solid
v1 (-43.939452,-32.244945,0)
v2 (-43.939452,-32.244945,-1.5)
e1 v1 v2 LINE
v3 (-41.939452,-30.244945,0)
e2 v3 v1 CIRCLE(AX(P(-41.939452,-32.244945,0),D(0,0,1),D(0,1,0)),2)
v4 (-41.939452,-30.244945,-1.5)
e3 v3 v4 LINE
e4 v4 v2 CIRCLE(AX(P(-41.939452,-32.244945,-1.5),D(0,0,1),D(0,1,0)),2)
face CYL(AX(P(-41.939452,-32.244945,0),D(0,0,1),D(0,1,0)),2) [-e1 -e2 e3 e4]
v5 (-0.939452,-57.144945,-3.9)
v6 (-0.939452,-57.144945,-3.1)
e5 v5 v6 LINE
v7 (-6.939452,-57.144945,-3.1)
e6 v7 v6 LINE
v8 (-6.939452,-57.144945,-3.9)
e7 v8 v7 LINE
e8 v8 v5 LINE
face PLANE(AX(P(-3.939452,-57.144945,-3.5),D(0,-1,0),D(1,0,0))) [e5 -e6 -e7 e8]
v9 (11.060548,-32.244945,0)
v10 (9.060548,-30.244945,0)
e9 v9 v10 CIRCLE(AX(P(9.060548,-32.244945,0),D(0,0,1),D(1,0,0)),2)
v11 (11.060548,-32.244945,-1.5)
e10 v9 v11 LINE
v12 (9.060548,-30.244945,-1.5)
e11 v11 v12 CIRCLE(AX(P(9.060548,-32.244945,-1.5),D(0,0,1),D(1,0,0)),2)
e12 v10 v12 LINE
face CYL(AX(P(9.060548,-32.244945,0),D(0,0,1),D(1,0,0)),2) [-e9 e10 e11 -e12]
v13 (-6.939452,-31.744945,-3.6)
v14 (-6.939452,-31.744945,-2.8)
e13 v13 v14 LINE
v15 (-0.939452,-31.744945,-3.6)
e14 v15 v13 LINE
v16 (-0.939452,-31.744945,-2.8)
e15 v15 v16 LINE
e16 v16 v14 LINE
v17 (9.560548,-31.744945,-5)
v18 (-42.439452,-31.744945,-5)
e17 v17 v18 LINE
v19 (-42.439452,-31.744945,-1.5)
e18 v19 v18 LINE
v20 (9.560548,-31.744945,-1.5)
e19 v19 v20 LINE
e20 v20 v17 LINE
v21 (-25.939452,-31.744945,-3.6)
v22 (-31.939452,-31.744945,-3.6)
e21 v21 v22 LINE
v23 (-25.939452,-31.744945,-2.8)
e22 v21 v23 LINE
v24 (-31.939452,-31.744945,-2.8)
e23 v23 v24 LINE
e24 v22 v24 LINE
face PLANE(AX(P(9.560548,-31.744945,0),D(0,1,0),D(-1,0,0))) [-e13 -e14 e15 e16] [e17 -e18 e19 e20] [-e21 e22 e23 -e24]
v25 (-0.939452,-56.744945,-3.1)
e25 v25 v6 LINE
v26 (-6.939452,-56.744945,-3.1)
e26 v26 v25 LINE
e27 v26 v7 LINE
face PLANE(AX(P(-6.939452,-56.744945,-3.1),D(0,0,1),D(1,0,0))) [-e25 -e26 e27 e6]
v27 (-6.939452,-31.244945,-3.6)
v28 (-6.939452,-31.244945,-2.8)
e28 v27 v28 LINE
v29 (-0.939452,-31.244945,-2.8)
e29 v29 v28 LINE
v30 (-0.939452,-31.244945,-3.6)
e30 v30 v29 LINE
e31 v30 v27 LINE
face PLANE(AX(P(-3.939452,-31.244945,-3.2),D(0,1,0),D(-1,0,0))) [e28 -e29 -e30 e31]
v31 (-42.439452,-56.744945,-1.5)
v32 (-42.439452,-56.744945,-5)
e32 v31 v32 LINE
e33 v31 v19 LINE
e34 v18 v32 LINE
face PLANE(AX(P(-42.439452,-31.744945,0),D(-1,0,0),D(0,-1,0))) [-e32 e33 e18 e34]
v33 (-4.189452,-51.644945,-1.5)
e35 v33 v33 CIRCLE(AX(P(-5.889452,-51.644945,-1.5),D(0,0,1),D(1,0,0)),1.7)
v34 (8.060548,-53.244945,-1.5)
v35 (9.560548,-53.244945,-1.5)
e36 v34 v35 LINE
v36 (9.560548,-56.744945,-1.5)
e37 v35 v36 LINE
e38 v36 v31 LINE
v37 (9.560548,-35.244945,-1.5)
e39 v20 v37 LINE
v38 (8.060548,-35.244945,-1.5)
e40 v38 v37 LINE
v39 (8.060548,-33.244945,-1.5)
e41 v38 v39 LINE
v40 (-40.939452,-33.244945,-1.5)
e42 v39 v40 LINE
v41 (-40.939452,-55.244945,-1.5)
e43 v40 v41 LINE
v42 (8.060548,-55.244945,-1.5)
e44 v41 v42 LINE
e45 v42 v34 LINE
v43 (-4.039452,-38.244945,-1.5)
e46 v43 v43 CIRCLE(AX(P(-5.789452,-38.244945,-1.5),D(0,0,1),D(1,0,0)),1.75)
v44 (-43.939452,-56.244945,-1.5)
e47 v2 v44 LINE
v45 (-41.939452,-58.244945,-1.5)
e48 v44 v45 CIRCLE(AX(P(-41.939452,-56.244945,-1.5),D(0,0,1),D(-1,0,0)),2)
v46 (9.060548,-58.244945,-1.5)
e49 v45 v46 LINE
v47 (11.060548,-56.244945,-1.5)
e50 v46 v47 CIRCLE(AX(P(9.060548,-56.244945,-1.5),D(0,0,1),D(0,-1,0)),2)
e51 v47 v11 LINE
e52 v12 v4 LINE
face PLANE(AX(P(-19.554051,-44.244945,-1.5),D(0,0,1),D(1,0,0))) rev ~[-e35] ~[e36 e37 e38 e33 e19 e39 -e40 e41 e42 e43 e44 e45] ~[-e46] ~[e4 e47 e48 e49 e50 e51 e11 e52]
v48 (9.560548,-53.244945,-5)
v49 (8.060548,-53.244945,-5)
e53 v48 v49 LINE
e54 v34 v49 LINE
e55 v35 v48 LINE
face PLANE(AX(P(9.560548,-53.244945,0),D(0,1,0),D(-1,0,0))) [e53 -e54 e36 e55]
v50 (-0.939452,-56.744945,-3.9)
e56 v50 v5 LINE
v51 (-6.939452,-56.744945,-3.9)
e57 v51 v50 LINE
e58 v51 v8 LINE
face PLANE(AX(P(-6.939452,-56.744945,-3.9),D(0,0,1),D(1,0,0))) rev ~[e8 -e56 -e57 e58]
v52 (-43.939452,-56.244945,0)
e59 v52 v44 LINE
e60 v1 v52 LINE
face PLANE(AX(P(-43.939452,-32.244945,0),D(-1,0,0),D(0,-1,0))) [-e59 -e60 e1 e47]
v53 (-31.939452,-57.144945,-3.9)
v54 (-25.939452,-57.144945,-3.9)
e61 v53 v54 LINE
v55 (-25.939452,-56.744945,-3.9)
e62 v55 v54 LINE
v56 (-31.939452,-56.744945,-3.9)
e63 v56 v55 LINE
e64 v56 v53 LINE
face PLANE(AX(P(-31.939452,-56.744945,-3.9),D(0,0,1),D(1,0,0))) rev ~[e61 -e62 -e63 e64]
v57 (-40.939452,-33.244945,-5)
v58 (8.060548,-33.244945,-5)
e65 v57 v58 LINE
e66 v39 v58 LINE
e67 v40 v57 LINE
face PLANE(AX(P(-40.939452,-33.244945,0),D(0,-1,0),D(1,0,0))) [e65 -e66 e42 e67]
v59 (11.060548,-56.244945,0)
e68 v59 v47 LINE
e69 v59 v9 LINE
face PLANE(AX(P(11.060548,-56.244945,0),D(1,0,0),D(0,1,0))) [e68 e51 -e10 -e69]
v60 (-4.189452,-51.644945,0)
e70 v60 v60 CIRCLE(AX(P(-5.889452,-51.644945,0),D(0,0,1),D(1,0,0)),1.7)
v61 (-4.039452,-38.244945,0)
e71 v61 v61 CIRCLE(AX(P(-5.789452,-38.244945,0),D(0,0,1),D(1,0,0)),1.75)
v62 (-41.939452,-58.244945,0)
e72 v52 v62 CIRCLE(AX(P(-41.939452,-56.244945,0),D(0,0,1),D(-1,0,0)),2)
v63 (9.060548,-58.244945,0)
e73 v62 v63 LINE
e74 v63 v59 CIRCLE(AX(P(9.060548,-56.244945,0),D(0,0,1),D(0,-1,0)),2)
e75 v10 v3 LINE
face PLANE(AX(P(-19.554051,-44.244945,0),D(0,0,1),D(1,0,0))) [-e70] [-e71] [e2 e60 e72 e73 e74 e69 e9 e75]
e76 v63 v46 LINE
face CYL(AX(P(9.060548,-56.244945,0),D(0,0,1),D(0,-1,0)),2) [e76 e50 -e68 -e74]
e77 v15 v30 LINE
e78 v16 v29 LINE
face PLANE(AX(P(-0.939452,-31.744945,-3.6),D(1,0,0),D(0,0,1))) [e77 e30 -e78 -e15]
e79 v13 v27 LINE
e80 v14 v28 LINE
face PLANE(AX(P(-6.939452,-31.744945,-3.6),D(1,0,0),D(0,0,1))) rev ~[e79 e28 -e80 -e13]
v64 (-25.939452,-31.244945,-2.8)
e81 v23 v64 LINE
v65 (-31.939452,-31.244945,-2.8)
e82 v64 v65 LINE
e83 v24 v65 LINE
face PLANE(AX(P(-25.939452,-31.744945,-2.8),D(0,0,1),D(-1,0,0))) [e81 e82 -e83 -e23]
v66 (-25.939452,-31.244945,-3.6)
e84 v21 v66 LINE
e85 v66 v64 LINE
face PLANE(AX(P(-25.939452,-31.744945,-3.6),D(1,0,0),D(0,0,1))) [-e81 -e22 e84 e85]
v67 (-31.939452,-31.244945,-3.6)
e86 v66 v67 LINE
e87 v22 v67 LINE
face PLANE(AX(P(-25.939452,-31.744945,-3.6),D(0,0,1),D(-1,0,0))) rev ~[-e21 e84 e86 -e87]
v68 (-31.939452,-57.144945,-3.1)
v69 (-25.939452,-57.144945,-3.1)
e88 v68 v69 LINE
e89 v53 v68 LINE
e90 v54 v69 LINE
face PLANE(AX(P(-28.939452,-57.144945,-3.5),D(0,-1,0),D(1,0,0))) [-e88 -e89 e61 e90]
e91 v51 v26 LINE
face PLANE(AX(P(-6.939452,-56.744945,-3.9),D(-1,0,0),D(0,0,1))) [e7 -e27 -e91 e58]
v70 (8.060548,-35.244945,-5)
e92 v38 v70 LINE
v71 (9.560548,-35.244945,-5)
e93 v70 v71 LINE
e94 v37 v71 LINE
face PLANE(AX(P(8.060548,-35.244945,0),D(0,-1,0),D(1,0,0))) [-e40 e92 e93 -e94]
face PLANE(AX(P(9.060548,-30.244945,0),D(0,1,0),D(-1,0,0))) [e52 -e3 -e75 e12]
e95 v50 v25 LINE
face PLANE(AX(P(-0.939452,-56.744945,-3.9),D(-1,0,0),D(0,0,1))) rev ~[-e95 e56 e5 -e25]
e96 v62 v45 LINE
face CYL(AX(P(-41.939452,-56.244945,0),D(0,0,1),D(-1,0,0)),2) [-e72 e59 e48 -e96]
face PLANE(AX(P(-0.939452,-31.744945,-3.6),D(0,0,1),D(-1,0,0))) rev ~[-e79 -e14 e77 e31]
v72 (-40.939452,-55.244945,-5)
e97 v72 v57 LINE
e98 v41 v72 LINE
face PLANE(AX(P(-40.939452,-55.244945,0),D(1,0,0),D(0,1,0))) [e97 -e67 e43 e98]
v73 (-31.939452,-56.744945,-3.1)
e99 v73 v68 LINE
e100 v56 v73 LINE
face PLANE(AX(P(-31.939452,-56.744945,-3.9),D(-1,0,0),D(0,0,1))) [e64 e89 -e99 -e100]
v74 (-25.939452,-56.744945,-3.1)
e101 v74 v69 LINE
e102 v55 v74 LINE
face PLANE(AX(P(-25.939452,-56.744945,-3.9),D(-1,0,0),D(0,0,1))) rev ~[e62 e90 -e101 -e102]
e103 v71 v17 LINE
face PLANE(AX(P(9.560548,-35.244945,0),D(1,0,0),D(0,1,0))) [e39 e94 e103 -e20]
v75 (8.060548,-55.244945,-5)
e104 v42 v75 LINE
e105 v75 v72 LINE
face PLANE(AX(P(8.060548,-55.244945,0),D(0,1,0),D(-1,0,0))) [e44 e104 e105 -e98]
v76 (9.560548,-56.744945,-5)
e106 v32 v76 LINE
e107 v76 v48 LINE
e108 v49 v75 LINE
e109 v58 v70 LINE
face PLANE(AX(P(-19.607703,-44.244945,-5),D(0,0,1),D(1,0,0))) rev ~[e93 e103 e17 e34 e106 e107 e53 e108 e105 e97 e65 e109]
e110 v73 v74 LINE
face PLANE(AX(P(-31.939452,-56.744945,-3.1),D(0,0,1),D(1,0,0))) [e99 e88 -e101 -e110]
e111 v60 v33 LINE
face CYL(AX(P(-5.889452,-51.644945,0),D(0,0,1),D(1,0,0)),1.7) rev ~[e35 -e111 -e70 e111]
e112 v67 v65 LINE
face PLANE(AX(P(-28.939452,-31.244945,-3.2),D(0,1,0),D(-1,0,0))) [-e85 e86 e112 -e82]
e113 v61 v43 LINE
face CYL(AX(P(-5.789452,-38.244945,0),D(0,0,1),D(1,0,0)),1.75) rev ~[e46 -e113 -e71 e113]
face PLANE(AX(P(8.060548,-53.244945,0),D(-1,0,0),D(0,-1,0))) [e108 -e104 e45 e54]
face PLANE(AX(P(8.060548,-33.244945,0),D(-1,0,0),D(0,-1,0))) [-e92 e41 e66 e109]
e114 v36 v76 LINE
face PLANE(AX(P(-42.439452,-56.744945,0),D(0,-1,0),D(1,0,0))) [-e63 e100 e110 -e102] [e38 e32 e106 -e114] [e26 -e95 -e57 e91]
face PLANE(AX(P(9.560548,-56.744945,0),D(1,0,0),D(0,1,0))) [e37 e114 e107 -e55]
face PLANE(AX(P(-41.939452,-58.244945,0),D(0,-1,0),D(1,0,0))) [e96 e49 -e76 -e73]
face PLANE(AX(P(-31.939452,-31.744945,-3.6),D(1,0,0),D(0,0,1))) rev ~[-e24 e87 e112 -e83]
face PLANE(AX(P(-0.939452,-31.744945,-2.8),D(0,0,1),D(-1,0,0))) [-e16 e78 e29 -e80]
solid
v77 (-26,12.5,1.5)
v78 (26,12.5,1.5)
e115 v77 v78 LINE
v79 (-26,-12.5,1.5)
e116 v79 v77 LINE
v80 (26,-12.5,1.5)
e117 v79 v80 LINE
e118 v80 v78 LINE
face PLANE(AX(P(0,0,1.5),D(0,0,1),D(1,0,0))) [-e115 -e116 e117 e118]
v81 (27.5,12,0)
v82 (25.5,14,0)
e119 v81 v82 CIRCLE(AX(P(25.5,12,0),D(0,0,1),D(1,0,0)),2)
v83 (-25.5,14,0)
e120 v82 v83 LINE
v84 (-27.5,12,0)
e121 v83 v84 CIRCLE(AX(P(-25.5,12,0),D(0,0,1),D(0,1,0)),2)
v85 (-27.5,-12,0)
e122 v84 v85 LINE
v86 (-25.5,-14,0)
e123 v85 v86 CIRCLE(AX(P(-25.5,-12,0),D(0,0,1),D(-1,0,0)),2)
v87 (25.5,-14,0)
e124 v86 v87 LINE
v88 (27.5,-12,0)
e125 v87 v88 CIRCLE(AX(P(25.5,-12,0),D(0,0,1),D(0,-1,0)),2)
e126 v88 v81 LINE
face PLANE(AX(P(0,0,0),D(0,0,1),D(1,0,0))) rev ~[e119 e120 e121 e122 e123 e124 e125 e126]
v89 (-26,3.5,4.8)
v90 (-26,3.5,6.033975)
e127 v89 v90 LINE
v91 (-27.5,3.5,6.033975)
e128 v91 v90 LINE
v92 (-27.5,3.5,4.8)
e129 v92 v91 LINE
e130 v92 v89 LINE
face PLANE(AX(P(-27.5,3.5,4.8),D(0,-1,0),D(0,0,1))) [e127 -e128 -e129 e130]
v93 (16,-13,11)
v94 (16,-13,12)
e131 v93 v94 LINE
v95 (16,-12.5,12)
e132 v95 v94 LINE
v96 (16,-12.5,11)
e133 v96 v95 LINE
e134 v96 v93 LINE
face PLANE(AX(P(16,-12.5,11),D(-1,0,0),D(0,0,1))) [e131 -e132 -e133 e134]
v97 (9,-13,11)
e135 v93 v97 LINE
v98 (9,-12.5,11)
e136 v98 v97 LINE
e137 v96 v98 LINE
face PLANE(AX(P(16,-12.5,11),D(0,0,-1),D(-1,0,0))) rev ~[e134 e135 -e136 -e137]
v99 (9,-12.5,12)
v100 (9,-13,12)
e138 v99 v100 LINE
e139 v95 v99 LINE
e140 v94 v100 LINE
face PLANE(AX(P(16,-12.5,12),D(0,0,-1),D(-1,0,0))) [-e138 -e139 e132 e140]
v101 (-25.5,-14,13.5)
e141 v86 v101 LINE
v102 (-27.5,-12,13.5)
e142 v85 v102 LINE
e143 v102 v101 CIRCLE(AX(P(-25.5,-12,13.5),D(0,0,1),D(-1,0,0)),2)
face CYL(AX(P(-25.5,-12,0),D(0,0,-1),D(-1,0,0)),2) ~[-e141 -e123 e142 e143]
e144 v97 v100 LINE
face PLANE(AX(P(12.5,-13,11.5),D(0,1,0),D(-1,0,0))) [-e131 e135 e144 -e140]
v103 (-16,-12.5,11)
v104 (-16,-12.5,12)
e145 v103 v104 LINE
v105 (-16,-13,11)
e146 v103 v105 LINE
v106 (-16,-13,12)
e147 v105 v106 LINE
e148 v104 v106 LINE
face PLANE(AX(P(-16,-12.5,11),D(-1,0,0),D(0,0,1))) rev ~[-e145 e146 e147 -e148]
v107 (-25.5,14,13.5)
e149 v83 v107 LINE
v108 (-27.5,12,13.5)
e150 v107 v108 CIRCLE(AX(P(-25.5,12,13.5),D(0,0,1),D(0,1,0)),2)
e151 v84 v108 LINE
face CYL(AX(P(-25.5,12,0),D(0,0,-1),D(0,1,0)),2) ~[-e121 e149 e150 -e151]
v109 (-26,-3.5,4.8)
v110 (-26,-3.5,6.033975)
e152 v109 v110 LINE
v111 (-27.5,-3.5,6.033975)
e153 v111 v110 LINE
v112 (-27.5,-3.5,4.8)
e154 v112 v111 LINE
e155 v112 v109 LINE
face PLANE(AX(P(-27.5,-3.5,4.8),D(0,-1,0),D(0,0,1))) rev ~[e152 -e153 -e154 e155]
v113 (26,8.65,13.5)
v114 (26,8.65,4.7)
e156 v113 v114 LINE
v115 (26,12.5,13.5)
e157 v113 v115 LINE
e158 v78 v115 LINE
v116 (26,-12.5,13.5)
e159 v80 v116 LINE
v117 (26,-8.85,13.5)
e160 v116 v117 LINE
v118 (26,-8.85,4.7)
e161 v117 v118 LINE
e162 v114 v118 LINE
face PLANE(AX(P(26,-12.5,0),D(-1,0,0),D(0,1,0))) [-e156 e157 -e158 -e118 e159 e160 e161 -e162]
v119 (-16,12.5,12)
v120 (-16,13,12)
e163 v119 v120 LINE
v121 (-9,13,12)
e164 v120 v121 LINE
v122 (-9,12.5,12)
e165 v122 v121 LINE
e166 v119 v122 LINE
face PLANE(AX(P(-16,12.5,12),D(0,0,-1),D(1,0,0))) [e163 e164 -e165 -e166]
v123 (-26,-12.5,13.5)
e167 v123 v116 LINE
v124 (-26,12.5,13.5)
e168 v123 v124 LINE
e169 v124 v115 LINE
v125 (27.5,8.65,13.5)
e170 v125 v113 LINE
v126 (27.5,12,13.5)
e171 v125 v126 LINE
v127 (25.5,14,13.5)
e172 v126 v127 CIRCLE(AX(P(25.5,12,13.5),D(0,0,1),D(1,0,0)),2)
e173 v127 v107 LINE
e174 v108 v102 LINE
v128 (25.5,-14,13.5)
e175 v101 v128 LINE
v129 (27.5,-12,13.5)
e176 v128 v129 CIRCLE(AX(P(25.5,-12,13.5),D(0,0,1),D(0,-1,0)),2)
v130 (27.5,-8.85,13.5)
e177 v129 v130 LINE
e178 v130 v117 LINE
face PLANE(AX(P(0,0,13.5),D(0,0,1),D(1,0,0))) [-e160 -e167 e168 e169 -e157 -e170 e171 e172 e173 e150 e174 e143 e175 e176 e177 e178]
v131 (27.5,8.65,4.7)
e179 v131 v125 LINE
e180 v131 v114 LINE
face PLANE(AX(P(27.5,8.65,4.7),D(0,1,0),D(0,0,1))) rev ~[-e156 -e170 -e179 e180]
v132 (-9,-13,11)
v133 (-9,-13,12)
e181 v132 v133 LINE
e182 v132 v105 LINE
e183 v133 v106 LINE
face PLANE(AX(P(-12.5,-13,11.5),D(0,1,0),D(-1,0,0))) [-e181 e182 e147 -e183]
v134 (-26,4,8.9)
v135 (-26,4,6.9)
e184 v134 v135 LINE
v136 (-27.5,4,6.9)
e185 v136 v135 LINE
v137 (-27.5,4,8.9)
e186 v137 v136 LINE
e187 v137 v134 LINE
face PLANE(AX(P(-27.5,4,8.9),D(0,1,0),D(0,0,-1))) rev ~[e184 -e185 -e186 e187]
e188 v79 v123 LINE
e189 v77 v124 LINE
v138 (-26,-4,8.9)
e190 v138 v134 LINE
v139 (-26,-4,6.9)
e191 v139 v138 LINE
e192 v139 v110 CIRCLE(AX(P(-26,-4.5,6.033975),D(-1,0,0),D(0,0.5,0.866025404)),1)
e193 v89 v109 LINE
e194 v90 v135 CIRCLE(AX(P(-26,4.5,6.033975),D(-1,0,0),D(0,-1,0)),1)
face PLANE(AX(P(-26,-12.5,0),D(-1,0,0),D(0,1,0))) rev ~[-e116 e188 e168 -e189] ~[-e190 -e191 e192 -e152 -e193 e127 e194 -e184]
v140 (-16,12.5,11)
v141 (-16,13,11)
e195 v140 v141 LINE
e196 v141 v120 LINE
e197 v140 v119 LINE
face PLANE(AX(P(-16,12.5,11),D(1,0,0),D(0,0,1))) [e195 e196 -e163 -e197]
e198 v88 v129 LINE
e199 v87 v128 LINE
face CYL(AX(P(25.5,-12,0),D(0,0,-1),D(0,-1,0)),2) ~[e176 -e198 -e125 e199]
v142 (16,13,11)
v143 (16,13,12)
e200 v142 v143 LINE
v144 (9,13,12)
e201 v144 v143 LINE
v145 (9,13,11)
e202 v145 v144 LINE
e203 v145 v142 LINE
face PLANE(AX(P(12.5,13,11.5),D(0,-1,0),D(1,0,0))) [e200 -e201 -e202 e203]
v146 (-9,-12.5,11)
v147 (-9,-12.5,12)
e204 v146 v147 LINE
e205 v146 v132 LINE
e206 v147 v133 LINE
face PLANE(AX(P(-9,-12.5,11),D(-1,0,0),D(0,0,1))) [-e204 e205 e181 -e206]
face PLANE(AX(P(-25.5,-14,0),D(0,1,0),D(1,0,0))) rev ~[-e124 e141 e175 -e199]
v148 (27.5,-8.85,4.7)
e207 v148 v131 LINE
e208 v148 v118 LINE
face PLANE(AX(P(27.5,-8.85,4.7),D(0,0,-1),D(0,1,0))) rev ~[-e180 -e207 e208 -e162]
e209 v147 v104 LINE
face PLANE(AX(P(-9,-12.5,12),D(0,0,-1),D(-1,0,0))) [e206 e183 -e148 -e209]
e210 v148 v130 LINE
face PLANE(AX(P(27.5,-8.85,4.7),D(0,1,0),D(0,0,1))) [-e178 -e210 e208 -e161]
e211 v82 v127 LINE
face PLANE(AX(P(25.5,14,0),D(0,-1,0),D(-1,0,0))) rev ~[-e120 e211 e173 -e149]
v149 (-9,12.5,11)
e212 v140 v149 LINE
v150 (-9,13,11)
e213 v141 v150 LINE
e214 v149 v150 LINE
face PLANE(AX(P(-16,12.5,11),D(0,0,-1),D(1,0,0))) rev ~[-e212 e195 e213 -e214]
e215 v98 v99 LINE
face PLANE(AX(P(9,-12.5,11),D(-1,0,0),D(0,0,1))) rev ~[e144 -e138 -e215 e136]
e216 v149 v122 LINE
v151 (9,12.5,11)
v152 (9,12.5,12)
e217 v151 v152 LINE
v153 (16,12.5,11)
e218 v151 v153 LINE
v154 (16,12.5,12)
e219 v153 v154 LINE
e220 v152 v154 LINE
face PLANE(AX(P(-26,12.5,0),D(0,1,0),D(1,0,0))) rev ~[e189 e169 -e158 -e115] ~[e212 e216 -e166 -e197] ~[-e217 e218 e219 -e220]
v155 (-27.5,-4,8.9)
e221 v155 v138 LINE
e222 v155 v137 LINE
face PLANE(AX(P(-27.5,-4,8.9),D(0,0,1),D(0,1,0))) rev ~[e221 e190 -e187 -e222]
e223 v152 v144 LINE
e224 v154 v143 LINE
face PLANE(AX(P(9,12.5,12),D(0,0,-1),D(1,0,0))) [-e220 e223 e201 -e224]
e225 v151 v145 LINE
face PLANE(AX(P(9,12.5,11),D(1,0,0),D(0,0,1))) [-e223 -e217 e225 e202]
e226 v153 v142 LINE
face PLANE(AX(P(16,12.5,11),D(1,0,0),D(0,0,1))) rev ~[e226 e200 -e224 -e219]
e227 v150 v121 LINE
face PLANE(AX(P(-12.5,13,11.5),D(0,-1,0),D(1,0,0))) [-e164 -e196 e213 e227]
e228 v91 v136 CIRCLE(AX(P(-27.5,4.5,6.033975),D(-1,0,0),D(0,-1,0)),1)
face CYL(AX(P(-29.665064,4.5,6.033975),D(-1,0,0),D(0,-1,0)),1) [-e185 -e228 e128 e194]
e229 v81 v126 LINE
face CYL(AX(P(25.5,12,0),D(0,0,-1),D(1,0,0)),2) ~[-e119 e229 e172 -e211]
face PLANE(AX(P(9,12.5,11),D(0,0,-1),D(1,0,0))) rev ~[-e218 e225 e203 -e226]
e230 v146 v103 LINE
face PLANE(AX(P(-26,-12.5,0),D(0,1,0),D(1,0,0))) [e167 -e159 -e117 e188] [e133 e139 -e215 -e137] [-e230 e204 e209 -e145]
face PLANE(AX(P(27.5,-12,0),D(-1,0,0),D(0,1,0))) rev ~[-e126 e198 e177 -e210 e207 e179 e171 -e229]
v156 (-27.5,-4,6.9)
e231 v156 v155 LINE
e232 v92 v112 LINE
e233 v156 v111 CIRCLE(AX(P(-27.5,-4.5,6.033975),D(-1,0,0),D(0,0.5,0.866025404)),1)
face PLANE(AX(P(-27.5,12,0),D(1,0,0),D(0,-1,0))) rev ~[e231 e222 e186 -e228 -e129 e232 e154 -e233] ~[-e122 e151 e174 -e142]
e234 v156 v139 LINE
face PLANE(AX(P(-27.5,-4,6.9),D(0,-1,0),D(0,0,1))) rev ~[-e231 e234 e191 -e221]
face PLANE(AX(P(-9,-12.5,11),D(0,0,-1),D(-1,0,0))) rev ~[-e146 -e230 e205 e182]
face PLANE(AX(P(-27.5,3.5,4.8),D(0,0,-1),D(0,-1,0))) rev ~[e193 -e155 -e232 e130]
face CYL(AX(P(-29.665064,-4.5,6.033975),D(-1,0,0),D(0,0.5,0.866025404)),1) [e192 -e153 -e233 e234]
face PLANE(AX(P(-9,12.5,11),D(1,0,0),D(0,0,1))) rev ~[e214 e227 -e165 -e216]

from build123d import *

# Parameters (mm, degrees)
F0_W        = 52
F0_H        = 25
F0_R        = 1.75
F1_DEPTH    = 1.5
F2_DEPTH    = 13.5
F3_W        = 17.5
F3_H        = 8.8
F4_DEPTH    = 25
F5_W        = 7
F5_H        = 2.1
F6_DEPTH    = 2
F7_T1_DEPTH = 5.8301270189
F9_W        = 7
F9_H        = 1
F10_DEPTH   = 0.5
F11_W       = 7
F11_H       = 1
F12_DEPTH   = 0.5
F0_R_2      = 1.7
F0_W_2      = 1.5
F0_H_2      = 18
F13_DEPTH   = 1.5
F14_DEPTH   = 5
F15_W       = 6
F15_H       = 0.8
F16_DEPTH   = 0.4
F17_W       = 6
F17_H       = 0.8
F18_DEPTH   = 0.5


# Not quite as in the source:
# - a fillet or chamfer that OpenCascade refuses, or shapes differently, is made with other operations: its cross-section is extruded or revolved along the edge and cut away or added


with BuildPart() as f1:
    # F0 (on Top) → F1 (new body)
    with BuildSketch(Plane.XY):
        Rectangle(F0_W, F0_H)
        with Locations((-21.9428632408, 0)):
            Circle(F0_R, mode=Mode.SUBTRACT)
        with Locations((-21.9428632408, 0)):
            Circle(F0_R)
    extrude(amount=F1_DEPTH)

    # F0 (on Top) → F2 (join)
    with BuildSketch(Plane.XY):
        with BuildLine():
            Line((25.5, 14), (-25.5, 14))
            ThreePointArc((-25.5, 14), (-26.9142135624, 13.4142135624), (-27.5, 12))
            Line((-27.5, 12), (-27.5, -12))
            ThreePointArc((-27.5, -12), (-26.9142135624, -13.4142135624), (-25.5, -14))
            Line((-25.5, -14), (25.5, -14))
            ThreePointArc((25.5, -14), (26.9142135624, -13.4142135624), (27.5, -12))
            Line((27.5, -12), (27.5, 12))
            ThreePointArc((27.5, 12), (26.9142135624, 13.4142135624), (25.5, 14))
        make_face()
        Rectangle(F0_W, F0_H, mode=Mode.SUBTRACT)
    extrude(amount=F2_DEPTH)

    # F3 (on face) → F4 (cut)
    with BuildSketch(Plane.YZ.offset(27.5)):
        with Locations((-0.1, 9.1)):
            Rectangle(F3_W, F3_H)
    extrude(amount=-F4_DEPTH, mode=Mode.SUBTRACT)

    # F5 (on face) → F6 (cut)
    with BuildSketch(Plane(origin=(-27.5, 0, 0), x_dir=(0, -1, 0), z_dir=(-1, 0, 0))):
        with Locations((0, 5.85)):
            Rectangle(F5_W, F5_H)
        Polygon((-3.5, 6.9), (3.5, 6.9), (4, 6.9), (4, 8.9), (-4, 8.9), (-4, 6.9), align=None)
    extrude(amount=-F6_DEPTH, mode=Mode.SUBTRACT)

    # F7: fillet of radius 1 on 2 edges, made by hand

    # F7_s2 → F7_t1 (cut)
    with BuildSketch(Plane.YZ.offset(-29.6650635095)):
        with BuildLine():
            ThreePointArc((3.5, 6.0339745962), (3.6339745962, 6.5339745962), (4, 6.9))
            Line((4, 6.9), (3.5, 6.9))
            Line((3.5, 6.9), (3.5, 6.0339745962))
        make_face()
        with BuildLine():
            ThreePointArc((-4, 6.9), (-3.6339745962, 6.5339745962), (-3.5, 6.0339745962))
            Line((-3.5, 6.0339745962), (-3.5, 6.9))
            Line((-3.5, 6.9), (-4, 6.9))
        make_face()
    extrude(amount=F7_T1_DEPTH, mode=Mode.SUBTRACT)

    # F9 (on face) → F10 (cut)
    with BuildSketch(Plane.XZ.offset(-12.5)):
        with Locations((-12.5, 11.5)):
            Rectangle(F9_W, F9_H)
        with Locations((12.5, 11.5)):
            Rectangle(F9_W, F9_H)
    extrude(amount=-F10_DEPTH, mode=Mode.SUBTRACT)

    # F11 (on face) → F12 (cut)
    with BuildSketch(Plane(origin=(0, -12.5, 0), x_dir=(-1, 0, 0), z_dir=(0, 1, 0))):
        with Locations((-12.5, 11.5)):
            Rectangle(F11_W, F11_H)
        with Locations((12.5, 11.5)):
            Rectangle(F11_W, F11_H)
    extrude(amount=-F12_DEPTH, mode=Mode.SUBTRACT)


with BuildPart() as f13:
    # F0 (on Top) → F13 (new body)
    with BuildSketch(Plane.XY):
        with BuildLine():
            Line((-42.439452043, -56.7449450493), (-42.439452043, -31.7449450493))
            Line((-42.439452043, -31.7449450493), (9.560547957, -31.7449450493))
            Line((9.560547957, -31.7449450493), (9.560547957, -35.2449450493))
            Line((9.560547957, -35.2449450493), (11.060547957, -35.2449450493))
            Line((11.060547957, -35.2449450493), (11.060547957, -32.2449450493))
            ThreePointArc((11.060547957, -32.2449450493), (10.4747615194, -30.8307314869), (9.060547957, -30.2449450493))
            Line((9.060547957, -30.2449450493), (-41.939452043, -30.2449450493))
            ThreePointArc((-41.939452043, -30.2449450493), (-43.3536656054, -30.8307314869), (-43.939452043, -32.2449450493))
            Line((-43.939452043, -32.2449450493), (-43.939452043, -56.2449450493))
            ThreePointArc((-43.939452043, -56.2449450493), (-43.3536656054, -57.6591586117), (-41.939452043, -58.2449450493))
            Line((-41.939452043, -58.2449450493), (9.060547957, -58.2449450493))
            ThreePointArc((9.060547957, -58.2449450493), (10.4747615194, -57.6591586117), (11.060547957, -56.2449450493))
            Line((11.060547957, -56.2449450493), (11.060547957, -53.2449450493))
            Line((11.060547957, -53.2449450493), (9.560547957, -53.2449450493))
            Line((9.560547957, -53.2449450493), (9.560547957, -56.7449450493))
            Line((9.560547957, -56.7449450493), (-42.439452043, -56.7449450493))
        make_face()
        Polygon((8.060547957, -53.2449450493), (8.060547957, -35.2449450493), (8.060547957, -33.2449450493), (-40.939452043, -33.2449450493), (-40.939452043, -55.2449450493), (8.060547957, -55.2449450493), align=None)
        with Locations((-38.3823152838, -44.2449450493)):
            Circle(F0_R, mode=Mode.SUBTRACT)
        with Locations((-5.889452043, -51.6449450493)):
            Circle(F0_R_2, mode=Mode.SUBTRACT)
        with Locations((-5.789452043, -38.2449450493)):
            Circle(F0_R, mode=Mode.SUBTRACT)
        with Locations((-38.3823152838, -44.2449450493)):
            Circle(F0_R)
        with Locations((8.810547957, -44.2449450493)):
            Rectangle(F0_W_2, F0_H_2)
        with Locations((10.310547957, -44.2449450493)):
            Rectangle(F0_W_2, F0_H_2)
    extrude(amount=-F13_DEPTH)

    # F0 (on Top) → F14 (join)
    with BuildSketch(Plane.XY):
        Polygon((9.560547957, -31.7449450493), (-42.439452043, -31.7449450493), (-42.439452043, -56.7449450493), (9.560547957, -56.7449450493), (9.560547957, -53.2449450493), (8.060547957, -53.2449450493), (8.060547957, -55.2449450493), (-40.939452043, -55.2449450493), (-40.939452043, -33.2449450493), (8.060547957, -33.2449450493), (8.060547957, -35.2449450493), (9.560547957, -35.2449450493), align=None)
    extrude(amount=-F14_DEPTH)

    # F15 (on face) → F16 (join)
    with BuildSketch(Plane.XZ.offset(56.7449450493)):
        with Locations((-28.939452043, -3.5)):
            Rectangle(F15_W, F15_H)
        with Locations((-3.939452043, -3.5)):
            Rectangle(F15_W, F15_H)
    extrude(amount=F16_DEPTH)

    # F17 (on face) → F18 (join)
    with BuildSketch(Plane(origin=(0, -31.7449450493, 0), x_dir=(-1, 0, 0), z_dir=(0, 1, 0))):
        with Locations((28.939452043, -3.2)):
            Rectangle(F17_W, F17_H)
        with Locations((3.939452043, -3.2)):
            Rectangle(F17_W, F17_H)
    extrude(amount=F18_DEPTH)


solid = Compound([f1.part, f13.part])
